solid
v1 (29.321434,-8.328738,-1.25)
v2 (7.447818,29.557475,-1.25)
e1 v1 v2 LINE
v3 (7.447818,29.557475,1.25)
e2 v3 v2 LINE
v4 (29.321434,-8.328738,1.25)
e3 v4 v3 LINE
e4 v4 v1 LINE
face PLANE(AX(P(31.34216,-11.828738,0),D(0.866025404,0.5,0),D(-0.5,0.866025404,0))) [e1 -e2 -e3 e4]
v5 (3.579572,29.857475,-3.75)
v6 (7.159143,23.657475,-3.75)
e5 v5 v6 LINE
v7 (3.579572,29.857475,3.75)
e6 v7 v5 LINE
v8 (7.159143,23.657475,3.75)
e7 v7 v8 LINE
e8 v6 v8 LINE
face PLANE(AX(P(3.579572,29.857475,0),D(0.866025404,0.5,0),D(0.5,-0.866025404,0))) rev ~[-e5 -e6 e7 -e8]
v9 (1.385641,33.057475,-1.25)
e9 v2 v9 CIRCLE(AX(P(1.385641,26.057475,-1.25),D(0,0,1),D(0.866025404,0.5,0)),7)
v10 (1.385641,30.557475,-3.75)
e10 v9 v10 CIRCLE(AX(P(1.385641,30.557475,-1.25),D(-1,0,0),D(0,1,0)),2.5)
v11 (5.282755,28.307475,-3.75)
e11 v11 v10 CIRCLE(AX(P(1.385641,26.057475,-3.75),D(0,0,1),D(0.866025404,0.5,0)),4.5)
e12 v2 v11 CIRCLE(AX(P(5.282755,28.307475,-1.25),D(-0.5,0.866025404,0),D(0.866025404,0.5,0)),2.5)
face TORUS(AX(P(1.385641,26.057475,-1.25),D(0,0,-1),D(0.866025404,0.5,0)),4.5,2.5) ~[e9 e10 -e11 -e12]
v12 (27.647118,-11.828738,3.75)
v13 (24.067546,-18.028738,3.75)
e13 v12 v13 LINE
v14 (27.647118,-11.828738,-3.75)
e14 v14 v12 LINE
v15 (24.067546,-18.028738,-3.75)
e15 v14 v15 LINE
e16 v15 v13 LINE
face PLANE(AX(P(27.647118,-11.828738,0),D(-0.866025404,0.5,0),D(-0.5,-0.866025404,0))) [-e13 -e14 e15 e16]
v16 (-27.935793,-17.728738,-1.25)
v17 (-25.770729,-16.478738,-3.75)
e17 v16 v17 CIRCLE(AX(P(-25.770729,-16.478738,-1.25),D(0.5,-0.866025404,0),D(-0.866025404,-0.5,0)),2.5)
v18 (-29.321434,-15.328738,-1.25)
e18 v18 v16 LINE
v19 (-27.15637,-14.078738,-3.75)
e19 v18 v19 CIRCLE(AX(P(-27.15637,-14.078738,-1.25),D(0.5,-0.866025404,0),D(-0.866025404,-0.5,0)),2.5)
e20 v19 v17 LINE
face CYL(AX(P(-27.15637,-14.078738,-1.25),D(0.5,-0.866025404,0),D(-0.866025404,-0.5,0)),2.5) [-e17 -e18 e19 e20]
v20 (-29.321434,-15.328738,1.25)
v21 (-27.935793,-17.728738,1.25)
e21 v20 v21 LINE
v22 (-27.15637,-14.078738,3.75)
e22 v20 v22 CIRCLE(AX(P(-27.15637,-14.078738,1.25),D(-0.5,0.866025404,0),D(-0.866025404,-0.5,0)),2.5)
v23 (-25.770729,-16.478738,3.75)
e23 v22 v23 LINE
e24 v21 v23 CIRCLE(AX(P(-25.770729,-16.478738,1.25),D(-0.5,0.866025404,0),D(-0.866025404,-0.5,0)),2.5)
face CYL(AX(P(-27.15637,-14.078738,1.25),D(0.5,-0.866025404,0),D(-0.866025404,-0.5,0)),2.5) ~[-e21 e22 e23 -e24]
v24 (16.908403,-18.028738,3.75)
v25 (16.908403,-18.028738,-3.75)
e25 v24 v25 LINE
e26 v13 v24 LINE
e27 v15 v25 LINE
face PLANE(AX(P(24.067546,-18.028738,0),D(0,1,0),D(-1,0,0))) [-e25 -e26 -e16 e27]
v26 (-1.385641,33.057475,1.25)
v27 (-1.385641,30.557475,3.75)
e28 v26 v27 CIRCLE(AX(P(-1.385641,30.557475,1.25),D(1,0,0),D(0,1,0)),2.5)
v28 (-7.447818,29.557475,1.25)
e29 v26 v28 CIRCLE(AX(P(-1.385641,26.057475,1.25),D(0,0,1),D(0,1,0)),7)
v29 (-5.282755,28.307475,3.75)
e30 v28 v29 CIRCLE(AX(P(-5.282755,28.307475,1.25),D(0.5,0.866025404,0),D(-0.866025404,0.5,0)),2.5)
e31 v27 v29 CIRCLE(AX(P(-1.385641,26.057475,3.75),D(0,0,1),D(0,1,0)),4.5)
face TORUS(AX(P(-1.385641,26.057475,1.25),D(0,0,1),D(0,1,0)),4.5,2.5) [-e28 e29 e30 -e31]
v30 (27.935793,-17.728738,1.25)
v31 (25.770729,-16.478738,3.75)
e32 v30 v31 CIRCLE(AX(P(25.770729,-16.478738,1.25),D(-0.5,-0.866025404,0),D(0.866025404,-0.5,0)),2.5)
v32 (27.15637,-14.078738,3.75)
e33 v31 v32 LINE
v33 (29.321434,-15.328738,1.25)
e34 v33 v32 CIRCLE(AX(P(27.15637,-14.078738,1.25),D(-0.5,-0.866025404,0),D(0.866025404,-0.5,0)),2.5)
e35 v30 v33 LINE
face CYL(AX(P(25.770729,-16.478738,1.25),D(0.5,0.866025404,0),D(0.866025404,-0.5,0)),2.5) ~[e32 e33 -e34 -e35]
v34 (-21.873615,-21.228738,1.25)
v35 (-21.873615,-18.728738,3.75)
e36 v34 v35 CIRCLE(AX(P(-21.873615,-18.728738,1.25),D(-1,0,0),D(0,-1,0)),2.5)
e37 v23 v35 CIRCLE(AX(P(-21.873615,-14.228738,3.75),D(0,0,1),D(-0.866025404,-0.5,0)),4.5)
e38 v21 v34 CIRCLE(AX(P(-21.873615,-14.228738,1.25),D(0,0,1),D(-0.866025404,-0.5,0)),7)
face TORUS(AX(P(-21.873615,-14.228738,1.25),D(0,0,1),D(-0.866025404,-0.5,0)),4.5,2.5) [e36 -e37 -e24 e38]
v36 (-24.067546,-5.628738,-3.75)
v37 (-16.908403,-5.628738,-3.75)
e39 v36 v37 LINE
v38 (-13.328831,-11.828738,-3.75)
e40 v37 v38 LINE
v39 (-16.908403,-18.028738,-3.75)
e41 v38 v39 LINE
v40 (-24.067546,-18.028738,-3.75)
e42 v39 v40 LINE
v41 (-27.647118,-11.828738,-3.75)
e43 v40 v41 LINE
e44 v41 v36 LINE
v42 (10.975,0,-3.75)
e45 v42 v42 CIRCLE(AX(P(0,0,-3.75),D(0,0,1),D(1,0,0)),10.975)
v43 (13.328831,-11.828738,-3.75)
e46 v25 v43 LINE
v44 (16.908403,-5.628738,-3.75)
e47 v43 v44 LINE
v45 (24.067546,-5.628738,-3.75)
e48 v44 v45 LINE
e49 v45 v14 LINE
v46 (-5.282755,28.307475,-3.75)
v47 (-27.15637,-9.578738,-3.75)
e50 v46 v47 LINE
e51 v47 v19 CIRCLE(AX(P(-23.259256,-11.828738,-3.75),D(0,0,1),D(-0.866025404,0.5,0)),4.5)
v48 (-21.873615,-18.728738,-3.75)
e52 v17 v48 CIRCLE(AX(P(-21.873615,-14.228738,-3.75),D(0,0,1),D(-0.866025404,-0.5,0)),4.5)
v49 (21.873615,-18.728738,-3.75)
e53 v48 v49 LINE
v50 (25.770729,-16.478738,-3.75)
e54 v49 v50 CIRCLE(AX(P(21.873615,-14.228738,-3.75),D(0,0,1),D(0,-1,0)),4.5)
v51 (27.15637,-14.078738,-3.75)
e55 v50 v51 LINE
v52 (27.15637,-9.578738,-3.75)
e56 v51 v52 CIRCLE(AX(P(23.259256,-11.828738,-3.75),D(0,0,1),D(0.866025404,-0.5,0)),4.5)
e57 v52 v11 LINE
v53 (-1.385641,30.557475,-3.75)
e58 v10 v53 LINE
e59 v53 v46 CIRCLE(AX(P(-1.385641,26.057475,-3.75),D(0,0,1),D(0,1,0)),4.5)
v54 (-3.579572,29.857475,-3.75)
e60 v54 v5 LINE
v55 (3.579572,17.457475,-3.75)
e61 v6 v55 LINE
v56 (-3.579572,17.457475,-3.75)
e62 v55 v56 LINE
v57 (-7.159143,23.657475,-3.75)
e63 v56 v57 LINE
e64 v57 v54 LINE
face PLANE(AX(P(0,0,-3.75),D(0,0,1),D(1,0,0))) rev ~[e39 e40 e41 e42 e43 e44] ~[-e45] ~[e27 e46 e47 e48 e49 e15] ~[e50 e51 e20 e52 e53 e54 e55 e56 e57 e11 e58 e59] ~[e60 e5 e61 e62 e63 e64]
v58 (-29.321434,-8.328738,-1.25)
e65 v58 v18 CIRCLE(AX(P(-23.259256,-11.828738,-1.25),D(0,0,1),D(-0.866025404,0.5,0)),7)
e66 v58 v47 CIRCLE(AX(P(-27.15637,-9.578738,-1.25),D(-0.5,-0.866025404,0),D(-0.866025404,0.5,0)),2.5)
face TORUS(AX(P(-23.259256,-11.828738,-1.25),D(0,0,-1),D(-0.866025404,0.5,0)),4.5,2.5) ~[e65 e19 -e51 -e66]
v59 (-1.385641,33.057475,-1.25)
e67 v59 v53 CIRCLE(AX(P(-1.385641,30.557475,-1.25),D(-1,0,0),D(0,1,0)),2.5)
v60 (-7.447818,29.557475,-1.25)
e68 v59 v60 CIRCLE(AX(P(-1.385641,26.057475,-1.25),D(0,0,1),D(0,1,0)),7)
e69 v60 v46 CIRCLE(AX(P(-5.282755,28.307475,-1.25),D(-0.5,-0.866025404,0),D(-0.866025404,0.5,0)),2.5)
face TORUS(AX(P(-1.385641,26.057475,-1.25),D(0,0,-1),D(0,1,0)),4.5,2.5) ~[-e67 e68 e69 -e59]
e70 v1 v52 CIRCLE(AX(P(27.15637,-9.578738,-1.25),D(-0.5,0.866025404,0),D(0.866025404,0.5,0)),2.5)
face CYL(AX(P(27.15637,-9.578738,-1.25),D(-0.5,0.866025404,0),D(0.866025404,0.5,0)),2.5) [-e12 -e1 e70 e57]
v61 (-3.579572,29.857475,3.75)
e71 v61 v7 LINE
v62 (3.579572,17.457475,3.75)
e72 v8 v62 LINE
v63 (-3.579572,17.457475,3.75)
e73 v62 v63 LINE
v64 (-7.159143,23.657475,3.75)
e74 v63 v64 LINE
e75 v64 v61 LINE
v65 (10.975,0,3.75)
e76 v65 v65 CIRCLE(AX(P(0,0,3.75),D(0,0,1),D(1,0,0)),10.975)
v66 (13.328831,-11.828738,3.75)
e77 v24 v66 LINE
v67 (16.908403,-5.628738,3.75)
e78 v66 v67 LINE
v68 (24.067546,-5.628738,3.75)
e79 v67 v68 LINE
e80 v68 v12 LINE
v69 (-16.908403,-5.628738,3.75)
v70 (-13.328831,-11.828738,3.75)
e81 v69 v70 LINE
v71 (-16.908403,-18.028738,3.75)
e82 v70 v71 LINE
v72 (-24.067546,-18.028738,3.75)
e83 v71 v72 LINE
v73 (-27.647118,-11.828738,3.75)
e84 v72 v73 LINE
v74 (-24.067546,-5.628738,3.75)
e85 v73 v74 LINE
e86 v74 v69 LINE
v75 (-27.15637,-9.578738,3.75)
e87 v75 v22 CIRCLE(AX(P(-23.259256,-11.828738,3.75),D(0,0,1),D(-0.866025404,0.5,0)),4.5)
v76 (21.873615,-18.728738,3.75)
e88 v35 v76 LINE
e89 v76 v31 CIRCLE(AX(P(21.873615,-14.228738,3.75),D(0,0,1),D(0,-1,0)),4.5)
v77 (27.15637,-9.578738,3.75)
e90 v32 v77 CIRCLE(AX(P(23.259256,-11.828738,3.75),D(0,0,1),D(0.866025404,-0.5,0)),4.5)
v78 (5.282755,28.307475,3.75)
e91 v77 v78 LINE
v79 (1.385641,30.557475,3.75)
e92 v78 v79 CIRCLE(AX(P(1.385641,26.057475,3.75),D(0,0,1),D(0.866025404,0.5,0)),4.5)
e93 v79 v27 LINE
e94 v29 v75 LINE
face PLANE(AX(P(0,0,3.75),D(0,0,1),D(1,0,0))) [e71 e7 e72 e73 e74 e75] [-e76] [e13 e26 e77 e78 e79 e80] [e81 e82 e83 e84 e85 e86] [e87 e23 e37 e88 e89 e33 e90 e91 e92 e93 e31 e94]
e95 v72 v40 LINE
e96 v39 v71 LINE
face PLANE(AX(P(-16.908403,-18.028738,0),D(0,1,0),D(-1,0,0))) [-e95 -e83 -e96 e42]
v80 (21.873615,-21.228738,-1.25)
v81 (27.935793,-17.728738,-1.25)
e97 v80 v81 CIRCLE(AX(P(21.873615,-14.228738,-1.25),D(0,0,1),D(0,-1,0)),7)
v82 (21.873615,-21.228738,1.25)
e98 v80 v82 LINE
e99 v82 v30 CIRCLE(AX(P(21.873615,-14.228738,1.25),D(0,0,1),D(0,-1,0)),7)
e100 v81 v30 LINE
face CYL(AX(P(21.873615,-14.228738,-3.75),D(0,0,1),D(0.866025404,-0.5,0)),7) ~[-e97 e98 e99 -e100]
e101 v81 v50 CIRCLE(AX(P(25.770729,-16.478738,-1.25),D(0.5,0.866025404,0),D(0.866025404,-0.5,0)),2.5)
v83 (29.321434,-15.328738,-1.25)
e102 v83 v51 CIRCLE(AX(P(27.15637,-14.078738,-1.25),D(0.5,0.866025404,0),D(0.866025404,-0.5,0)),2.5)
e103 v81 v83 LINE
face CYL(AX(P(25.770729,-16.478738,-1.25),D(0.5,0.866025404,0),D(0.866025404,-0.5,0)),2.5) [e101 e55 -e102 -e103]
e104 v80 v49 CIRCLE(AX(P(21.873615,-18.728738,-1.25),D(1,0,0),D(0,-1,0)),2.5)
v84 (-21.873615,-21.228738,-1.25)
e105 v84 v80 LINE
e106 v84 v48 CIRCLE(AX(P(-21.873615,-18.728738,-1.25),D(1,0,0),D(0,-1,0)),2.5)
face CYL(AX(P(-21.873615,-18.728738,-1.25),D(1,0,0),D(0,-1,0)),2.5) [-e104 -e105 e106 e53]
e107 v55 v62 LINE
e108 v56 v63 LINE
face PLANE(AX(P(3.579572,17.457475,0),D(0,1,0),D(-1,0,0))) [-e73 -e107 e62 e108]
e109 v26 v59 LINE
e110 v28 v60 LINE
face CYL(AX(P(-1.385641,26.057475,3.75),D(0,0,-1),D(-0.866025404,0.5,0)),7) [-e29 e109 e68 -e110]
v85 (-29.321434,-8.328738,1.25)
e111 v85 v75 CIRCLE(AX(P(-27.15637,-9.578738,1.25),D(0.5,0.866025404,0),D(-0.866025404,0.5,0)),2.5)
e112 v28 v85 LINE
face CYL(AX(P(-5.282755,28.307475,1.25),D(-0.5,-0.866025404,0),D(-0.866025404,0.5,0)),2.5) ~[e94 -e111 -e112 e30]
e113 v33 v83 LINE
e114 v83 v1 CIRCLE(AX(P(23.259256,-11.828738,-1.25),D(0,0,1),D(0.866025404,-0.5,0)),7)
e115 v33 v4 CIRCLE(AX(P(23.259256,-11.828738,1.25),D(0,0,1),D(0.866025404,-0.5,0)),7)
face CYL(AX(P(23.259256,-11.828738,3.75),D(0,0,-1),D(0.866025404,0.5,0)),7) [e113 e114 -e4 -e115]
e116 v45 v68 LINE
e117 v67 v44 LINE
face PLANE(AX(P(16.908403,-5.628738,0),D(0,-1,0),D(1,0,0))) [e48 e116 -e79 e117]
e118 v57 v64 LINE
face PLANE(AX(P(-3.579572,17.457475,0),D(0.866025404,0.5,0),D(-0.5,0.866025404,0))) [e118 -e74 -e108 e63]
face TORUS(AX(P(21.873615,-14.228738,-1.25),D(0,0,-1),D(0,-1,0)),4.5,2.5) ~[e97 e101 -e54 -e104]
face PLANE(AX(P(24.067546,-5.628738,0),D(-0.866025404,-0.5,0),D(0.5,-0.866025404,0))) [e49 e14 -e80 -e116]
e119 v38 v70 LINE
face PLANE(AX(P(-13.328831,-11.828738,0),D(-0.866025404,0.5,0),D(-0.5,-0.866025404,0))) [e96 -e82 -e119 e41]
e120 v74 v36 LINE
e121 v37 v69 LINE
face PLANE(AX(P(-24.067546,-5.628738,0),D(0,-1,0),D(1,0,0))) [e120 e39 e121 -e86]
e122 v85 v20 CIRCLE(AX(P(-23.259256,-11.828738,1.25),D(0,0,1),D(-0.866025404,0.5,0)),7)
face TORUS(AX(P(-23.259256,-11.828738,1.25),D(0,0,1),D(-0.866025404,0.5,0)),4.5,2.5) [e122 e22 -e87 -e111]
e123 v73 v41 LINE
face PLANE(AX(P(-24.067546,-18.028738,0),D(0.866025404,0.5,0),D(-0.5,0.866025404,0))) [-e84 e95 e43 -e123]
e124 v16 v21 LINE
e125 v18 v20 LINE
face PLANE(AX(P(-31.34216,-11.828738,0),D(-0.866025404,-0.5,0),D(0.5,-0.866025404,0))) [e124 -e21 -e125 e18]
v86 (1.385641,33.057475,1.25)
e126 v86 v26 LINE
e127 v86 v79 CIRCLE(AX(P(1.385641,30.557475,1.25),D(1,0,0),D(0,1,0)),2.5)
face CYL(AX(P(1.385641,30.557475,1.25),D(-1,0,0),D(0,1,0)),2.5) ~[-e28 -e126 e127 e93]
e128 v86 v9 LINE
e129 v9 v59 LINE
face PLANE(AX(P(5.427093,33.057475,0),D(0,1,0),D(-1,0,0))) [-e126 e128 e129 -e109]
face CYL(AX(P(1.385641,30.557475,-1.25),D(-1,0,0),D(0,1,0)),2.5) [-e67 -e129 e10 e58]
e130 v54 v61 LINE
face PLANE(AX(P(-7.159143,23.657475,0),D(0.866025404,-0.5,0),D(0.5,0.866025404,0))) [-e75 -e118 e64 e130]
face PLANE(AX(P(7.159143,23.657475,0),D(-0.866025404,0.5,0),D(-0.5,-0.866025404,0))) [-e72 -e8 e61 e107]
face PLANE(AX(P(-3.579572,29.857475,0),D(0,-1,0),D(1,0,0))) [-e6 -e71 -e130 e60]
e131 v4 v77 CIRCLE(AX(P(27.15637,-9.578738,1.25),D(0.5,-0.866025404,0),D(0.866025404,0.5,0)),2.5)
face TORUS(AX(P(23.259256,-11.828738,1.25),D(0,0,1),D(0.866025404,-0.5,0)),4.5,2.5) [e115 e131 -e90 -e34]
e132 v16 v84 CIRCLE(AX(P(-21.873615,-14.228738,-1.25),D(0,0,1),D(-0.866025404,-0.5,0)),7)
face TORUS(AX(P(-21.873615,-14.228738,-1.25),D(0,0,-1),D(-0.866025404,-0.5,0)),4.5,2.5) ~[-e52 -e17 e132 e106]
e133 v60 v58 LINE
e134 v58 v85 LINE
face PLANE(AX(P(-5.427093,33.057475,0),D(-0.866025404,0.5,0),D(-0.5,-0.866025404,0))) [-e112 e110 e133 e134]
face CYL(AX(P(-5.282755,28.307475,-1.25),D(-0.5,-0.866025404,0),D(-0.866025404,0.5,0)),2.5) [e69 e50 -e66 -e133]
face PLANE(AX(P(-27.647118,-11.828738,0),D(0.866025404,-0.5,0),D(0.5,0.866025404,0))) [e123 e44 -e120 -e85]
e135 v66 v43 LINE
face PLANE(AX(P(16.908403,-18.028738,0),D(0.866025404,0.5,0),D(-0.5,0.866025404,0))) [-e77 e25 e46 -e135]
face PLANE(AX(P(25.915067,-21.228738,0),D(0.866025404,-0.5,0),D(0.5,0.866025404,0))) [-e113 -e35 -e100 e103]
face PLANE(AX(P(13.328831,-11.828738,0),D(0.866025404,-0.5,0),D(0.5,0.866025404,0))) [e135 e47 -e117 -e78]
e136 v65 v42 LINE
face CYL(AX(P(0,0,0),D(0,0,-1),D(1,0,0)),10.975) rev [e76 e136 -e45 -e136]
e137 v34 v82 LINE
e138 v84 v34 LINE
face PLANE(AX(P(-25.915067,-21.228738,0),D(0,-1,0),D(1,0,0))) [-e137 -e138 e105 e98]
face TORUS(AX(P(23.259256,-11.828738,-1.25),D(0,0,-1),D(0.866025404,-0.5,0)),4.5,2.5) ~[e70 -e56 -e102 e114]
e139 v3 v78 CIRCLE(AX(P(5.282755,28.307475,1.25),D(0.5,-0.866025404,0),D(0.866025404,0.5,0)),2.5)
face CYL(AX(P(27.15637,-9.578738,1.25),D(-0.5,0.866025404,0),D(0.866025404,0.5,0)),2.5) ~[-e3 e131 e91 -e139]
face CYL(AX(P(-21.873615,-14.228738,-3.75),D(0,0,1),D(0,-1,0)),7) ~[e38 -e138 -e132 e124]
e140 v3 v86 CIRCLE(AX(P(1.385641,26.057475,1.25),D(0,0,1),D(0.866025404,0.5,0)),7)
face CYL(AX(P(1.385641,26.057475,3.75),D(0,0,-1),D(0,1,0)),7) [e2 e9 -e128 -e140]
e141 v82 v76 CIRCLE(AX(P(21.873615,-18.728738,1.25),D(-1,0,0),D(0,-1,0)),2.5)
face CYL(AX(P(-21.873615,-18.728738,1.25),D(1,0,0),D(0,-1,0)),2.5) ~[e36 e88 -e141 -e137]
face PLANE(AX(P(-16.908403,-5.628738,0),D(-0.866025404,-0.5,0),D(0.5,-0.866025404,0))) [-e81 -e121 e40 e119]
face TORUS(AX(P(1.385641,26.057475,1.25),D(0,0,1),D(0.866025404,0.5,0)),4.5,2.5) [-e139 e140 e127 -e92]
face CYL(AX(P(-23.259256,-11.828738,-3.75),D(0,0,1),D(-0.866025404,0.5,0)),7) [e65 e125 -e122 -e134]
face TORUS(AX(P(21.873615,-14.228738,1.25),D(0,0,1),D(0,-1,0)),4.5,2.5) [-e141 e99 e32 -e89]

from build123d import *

# Parameters (mm, degrees)
F0_R     = 10.975
F1_DEPTH = 3.75
F2_R     = 7
F3_R     = 2.5


# Not quite as in the source:
# - a feature names something its author has since deleted; it is built from what else it names


with BuildPart() as f1:
    # F0 (on Top) → F1 (new body, symmetric)
    with BuildSketch(Plane.XY):
        Polygon((-5.4270925304, 33.057475201), (-10.8541850608, 23.657475201), (-25.9150670439, -2.4287376005), (-31.3421595743, -11.8287376005), (-25.9150670439, -21.2287376005), (-15.0608819831, -21.2287376005), (15.0608819831, -21.2287376005), (25.9150670439, -21.2287376005), (31.3421595743, -11.8287376005), (25.9150670439, -2.4287376005), (10.8541850608, 23.657475201), (5.4270925304, 33.057475201), align=None)
        Polygon((-16.9084028445, -5.6287376005), (-13.3288311755, -11.8287376005), (-16.9084028445, -18.0287376005), (-24.0675461825, -18.0287376005), (-27.6471178514, -11.8287376005), (-24.0675461825, -5.6287376005), align=None, mode=Mode.SUBTRACT)
        Circle(F0_R, mode=Mode.SUBTRACT)
        Polygon((24.0675461825, -5.6287376005), (27.6471178514, -11.8287376005), (24.0675461825, -18.0287376005), (16.9084028445, -18.0287376005), (13.3288311755, -11.8287376005), (16.9084028445, -5.6287376005), align=None, mode=Mode.SUBTRACT)
        Polygon((3.579571669, 29.857475201), (7.159143338, 23.657475201), (3.579571669, 17.457475201), (-3.579571669, 17.457475201), (-7.159143338, 23.657475201), (-3.579571669, 29.857475201), align=None, mode=Mode.SUBTRACT)
    extrude(amount=F1_DEPTH, both=True)

    # F2
    f2_edges = [f1.edges().sort_by_distance(p)[0] for p in [
        (31.34216, -11.828738, 0),
        (25.915067, -21.228738, 0),
        (-25.915067, -21.228738, 0),
        (-31.34216, -11.828738, 0),
        (-5.427093, 33.057475, 0),
        (5.427093, 33.057475, 0),
    ]]
    fillet(f2_edges, radius=F2_R)

    # F3
    f3_edges = [f1.edges().sort_by_distance(p)[0] for p in [
        (-18.384626, 10.614369, -3.75),
        (-7.447818, 29.557475, 0),
        (-29.321434, -8.328738, 0),
        (-18.384626, 10.614369, 3.75),
    ]]
    fillet(f3_edges, radius=F3_R)


solid = f1.part
